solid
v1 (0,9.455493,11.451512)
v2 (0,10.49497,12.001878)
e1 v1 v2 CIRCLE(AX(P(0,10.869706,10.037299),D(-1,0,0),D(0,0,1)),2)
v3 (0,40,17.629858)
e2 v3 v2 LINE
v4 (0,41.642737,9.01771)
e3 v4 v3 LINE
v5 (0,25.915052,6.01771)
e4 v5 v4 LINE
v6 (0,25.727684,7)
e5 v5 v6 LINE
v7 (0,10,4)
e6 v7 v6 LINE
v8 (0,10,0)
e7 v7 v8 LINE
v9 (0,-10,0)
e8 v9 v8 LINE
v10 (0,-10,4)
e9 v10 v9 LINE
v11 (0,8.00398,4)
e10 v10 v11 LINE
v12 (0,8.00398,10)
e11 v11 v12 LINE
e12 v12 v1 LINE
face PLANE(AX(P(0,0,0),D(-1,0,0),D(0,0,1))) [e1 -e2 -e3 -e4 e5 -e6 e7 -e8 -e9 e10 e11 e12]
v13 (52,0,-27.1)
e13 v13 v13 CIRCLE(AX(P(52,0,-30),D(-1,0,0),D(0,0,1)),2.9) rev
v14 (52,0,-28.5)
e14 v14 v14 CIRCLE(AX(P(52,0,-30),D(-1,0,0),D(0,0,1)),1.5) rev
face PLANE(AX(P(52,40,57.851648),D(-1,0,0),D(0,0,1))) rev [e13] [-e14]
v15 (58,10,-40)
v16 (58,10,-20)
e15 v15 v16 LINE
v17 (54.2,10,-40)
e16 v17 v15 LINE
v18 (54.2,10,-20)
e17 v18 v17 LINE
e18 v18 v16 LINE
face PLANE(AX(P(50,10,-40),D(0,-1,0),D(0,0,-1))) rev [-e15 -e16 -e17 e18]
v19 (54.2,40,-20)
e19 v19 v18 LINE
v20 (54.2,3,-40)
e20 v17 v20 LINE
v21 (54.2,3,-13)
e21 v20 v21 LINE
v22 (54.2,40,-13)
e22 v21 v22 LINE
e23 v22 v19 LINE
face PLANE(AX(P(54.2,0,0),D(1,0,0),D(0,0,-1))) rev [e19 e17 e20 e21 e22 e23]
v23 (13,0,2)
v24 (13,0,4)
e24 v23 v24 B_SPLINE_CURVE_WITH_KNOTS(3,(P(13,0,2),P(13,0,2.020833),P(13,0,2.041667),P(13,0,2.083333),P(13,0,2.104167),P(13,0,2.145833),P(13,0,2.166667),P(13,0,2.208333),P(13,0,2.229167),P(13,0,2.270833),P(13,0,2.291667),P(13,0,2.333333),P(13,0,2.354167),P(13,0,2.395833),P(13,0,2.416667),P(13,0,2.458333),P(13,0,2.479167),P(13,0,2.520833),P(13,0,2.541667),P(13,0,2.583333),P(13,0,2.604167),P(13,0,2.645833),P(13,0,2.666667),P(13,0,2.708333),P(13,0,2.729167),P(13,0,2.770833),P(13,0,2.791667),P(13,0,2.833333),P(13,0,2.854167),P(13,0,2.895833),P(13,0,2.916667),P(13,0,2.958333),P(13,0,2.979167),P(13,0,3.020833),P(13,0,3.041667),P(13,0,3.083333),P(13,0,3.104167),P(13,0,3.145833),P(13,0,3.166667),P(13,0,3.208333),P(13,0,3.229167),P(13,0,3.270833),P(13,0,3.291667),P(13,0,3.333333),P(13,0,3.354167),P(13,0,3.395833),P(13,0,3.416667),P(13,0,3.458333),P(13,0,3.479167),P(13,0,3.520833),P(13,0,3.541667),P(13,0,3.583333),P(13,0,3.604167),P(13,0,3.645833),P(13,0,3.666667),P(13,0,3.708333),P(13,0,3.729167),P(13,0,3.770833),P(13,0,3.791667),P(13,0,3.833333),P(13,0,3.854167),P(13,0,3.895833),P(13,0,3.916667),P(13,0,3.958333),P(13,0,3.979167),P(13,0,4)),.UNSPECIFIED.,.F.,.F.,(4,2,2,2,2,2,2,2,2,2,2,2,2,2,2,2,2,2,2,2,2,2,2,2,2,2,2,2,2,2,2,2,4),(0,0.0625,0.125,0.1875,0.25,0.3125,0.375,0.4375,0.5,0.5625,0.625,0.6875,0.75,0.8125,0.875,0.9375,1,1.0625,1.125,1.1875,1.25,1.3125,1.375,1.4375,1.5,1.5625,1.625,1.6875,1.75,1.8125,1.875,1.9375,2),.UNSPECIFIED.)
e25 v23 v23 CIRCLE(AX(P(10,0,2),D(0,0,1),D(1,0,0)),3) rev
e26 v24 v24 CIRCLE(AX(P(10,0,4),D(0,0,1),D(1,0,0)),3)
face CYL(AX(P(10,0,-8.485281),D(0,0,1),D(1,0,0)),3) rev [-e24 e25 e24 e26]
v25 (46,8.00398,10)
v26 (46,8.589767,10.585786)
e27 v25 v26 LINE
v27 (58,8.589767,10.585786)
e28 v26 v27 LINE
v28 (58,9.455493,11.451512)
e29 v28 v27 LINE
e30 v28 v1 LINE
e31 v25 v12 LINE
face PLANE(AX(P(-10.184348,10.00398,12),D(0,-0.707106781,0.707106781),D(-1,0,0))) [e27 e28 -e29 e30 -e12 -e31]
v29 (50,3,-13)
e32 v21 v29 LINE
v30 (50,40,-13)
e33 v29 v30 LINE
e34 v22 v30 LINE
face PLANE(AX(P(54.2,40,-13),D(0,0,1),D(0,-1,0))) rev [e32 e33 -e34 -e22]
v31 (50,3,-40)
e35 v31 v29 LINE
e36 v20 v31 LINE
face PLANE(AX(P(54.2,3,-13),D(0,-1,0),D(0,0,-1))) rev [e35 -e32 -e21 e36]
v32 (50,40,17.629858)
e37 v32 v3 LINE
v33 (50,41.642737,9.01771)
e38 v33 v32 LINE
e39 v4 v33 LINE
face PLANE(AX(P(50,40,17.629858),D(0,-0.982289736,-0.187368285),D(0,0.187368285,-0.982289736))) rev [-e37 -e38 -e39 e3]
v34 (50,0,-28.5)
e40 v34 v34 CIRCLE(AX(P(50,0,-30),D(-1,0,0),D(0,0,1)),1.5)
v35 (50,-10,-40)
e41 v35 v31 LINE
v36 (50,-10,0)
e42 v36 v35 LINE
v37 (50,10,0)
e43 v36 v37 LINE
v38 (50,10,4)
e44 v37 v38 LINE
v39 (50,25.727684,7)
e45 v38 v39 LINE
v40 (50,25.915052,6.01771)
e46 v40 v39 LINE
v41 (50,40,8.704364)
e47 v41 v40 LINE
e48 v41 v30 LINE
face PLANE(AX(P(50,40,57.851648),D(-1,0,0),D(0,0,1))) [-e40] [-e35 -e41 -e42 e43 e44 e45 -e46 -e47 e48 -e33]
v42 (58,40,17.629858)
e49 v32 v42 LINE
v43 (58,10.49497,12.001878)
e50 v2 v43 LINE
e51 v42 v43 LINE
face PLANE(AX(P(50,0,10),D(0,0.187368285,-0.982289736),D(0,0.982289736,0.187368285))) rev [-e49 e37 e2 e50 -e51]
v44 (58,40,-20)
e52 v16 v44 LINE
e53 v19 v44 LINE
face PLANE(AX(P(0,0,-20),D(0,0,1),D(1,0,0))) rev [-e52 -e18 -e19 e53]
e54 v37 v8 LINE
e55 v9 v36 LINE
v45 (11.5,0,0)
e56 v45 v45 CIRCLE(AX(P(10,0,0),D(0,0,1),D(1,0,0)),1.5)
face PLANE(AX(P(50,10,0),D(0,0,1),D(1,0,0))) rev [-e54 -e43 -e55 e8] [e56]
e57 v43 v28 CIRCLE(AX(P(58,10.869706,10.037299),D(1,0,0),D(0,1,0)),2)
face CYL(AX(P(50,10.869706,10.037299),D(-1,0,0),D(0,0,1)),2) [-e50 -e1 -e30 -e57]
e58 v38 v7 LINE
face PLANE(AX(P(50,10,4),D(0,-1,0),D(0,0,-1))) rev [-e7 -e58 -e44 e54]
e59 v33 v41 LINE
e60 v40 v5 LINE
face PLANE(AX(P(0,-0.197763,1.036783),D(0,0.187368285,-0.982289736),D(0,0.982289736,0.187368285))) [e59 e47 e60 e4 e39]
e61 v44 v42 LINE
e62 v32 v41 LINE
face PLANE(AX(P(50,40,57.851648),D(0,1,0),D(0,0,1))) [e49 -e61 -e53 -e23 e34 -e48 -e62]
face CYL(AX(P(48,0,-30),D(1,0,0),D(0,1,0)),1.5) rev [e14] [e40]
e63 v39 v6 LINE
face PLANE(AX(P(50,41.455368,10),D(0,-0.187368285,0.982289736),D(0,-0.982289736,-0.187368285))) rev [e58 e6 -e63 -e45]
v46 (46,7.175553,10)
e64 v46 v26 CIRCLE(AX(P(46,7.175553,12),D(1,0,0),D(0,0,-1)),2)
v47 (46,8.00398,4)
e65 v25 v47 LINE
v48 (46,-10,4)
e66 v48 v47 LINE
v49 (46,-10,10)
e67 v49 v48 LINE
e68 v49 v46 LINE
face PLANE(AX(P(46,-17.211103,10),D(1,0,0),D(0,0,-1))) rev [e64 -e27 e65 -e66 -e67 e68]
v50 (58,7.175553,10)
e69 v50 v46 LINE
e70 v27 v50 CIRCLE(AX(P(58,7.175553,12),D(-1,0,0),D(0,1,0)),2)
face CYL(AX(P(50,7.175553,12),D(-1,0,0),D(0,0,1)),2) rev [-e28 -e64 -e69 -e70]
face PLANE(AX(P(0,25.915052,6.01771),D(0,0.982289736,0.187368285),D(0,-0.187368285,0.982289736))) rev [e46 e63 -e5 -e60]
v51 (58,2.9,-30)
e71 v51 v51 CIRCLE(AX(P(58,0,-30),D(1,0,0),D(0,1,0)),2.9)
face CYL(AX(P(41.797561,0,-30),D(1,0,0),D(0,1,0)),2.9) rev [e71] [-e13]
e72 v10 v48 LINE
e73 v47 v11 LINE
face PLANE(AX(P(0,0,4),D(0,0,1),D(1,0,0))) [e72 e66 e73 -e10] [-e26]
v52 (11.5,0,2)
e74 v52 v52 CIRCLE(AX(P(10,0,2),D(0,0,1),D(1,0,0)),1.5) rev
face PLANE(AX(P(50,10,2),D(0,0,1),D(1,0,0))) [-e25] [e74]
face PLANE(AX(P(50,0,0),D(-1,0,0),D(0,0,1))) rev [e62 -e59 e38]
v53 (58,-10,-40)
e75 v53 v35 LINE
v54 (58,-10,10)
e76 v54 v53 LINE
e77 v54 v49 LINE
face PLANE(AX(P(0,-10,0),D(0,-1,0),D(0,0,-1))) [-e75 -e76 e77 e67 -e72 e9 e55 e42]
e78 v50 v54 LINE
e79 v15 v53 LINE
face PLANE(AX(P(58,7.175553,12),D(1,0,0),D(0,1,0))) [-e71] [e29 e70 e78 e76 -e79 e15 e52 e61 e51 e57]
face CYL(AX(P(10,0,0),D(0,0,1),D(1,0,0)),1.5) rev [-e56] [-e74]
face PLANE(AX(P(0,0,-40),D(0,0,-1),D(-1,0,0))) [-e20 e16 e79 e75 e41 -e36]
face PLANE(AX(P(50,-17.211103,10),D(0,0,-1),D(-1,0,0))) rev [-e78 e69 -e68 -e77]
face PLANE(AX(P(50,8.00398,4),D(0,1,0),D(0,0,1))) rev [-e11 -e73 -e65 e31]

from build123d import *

# Parameters (mm, degrees)
EXTRUDE_1_DEPTH      = 50
SKETCH_2_W           = 50
SKETCH_2_H           = 10
EXTRUDE_2_DEPTH      = 10
SKETCH_3_W           = 10
SKETCH_3_H           = 20
EXTRUDE_3_DEPTH      = 20
SKETCH_4_W           = 20
SKETCH_4_H           = 10
EXTRUDE_4_DEPTH      = 30
CUT_EXTRUDE_1_DEPTH  = 50
CHAMFER_1_SIZE       = 2
SKETCH_9_R           = 1.5
CUT_EXTRUDE_2_DEPTH  = 66.715656955
CUT_EXTRUDE_4_DEPTH  = 6
SKETCH_13_W          = 4
SKETCH_13_H          = 6
EXTRUDE_12_DEPTH     = 18.003980276
FILLET_2_R           = 2
SKETCH_15_W          = 20
SKETCH_15_H          = 50
SKETCH_15_R          = 1.5
EXTRUDE_14_DEPTH     = 4
CUT_EXTRUDE_5_DEPTH  = 4
SKETCH_17_W          = 16
SKETCH_17_H          = 50
CUT_EXTRUDE_6_DEPTH  = 4
EXTRUDE_15_DEPTH     = 10
SKETCH_20_W          = 4
SKETCH_20_H          = 50
EXTRUDE_16_DEPTH     = 20
SKETCH_23_W          = 24
SKETCH_23_H          = 22
CUT_EXTRUDE_9_DEPTH  = 4
EXTRUDE_17_REACH     = 74.184
SKETCH_25_W          = 4
SKETCH_25_H          = 12.288957455
EXTRUDE_18_DEPTH     = 22
CUT_EXTRUDE_10_DEPTH = 4
CUT_EXTRUDE_START    = -4
CUT_EXTRUDE_11_DEPTH = 4
CUT_EXTRUDE_14_DEPTH = 10
EXTRUDE_19_DEPTH     = 4
SKETCH_35_W          = 8
SKETCH_35_H          = 20
EXTRUDE_20_DEPTH     = 22
SKETCH_36_W          = 8
SKETCH_36_H          = 20
EXTRUDE_21_DEPTH     = 20
CUT_EXTRUDE_17_DEPTH = 4.2
SKETCH_38_R          = 1.5
CUT_EXTRUDE_18_DEPTH = 10
SKETCH_39_R          = 2.9
CUT_EXTRUDE_19_DEPTH = 6
SKETCH_40_R          = 3
CUT_EXTRUDE_20_DEPTH = 2
SKETCH_41_W          = 50
SKETCH_41_H          = 16.011247617
EXTRUDE_22_DEPTH     = 1


with BuildPart() as part:
    # 草图1 → 凸台-拉伸1 (new body)
    with BuildSketch(Plane(origin=(0, 0, 0), x_dir=(0, 0, -1), z_dir=(1, 0, 0))):
        Polygon((0, 0), (-10, 0), (-17.629858184, 40), (-10, 41.455368398), (-4, 10), (0, 10), align=None)
    extrude(amount=EXTRUDE_1_DEPTH)

    # 草图2 → 凸台-拉伸2 (add)
    with BuildSketch(Plane.XZ):
        with Locations((25, 5)):
            Rectangle(SKETCH_2_W, SKETCH_2_H)
    extrude(amount=EXTRUDE_2_DEPTH)

    # 草图3 → 凸台-拉伸3 (add)
    with BuildSketch(Plane.ZY):
        with Locations((5, 0)):
            Rectangle(SKETCH_3_W, SKETCH_3_H)
    extrude(amount=EXTRUDE_3_DEPTH)

    # 草图4 → 凸台-拉伸4 (add)
    with BuildSketch(Plane(origin=(0, 10, 0), x_dir=(1, 0, 0), z_dir=(0, 1, 0))):
        with Locations((-10, -5)):
            Rectangle(SKETCH_4_W, SKETCH_4_H)
    extrude(amount=EXTRUDE_4_DEPTH)

    # 草图5 → 切除-拉伸1 (cut)
    with BuildSketch(Plane(origin=(50, 0, 0), x_dir=(0, 0, -1), z_dir=(1, 0, 0))):
        Polygon((-10, 10.003980276), (-11.908223769, 10.003980276), (-10, 0), align=None)
    extrude(amount=-CUT_EXTRUDE_1_DEPTH, mode=Mode.SUBTRACT)

    # 倒角1
    # the kernel refuses this chamfer: 2 mm, written as the material it adds along each edge
    with BuildSketch(Plane(origin=(50, 10.003980276, 10), x_dir=(0, 0.027495876610586487, 0.9996219169112968), z_dir=(-1, 0, 0))) as chamfer_1_piece_1_section:
        Polygon((CHAMFER_1_SIZE * 0.999621916911, -CHAMFER_1_SIZE * 0.0274958766106), (-CHAMFER_1_SIZE * 0.0274958766106, -CHAMFER_1_SIZE * 0.999621916911), (0, 0), align=None)
    chamfer_1_piece_1 = extrude(amount=50, mode=Mode.PRIVATE)
    chamfer_1_piece_1 = split(chamfer_1_piece_1, bisect_by=Plane(origin=(25, 9.131023425, 11.741710345), z_dir=(0, 0.18736828457892524, -0.9822897362458548)), keep=Keep.TOP, mode=Mode.PRIVATE)
    add(chamfer_1_piece_1)

    # 草图9 → 切除-拉伸2 (cut, through all)
    with BuildSketch(Plane.XY.offset(10)):
        with Locations((-10, 20)):
            Circle(SKETCH_9_R)
        with Locations((10, 0)):
            Circle(SKETCH_9_R)
    extrude(amount=-CUT_EXTRUDE_2_DEPTH, mode=Mode.SUBTRACT)

    # 草图12 → 切除-拉伸4 (cut)
    with BuildSketch(Plane.XY.offset(10)):
        Polygon((50, -10), (50, 8.003980276), (0, 8.003980276), (0, 40), (-20, 40), (-20, -10), align=None)
    extrude(amount=-CUT_EXTRUDE_4_DEPTH, mode=Mode.SUBTRACT)

    # 草图13 → 凸台-拉伸12 (add)
    with BuildSketch(Plane.XZ.offset(-8.003980276)):
        with Locations((2, 7)):
            Rectangle(SKETCH_13_W, SKETCH_13_H)
        with Locations((48, 7)):
            Rectangle(SKETCH_13_W, SKETCH_13_H)
    extrude(amount=EXTRUDE_12_DEPTH)

    # 圆角2
    fillet_2_edges = [part.edges().sort_by_distance(p)[0] for p in [
        (2, 8.003980276, 10),
        (48, 8.003980276, 10),
        (25, 9.890571776, 11.8865915),
    ]]
    fillet(fillet_2_edges, radius=FILLET_2_R)

    # 草图15 → 凸台-拉伸14 (add)
    with BuildSketch(Plane(origin=(0, 0, 0), x_dir=(-1, 0, 0), z_dir=(0, 0, -1))):
        with Locations((-60, 15)):
            Rectangle(SKETCH_15_W, SKETCH_15_H)
        with Locations(Location((-60, 20, 0), (0, 0, 180))):
            Circle(SKETCH_15_R, mode=Mode.SUBTRACT)
    extrude(amount=-EXTRUDE_14_DEPTH)

    # 草图16 → 切除-拉伸5 (cut)
    with BuildSketch(Plane.XY.offset(4)):
        Polygon((-20, -10), (0, -10), (0, 10), (0, 40), (-20, 40), align=None)
    extrude(amount=-CUT_EXTRUDE_5_DEPTH, mode=Mode.SUBTRACT)

    # 草图17 → 切除-拉伸6 (cut)
    with BuildSketch(Plane.XY.offset(4)):
        with Locations((62, 15)):
            Rectangle(SKETCH_17_W, SKETCH_17_H)
    extrude(amount=-CUT_EXTRUDE_6_DEPTH, mode=Mode.SUBTRACT)

    # 草图18 → 凸台-拉伸15 (add)
    with BuildSketch(Plane.ZY.offset(-50)):
        Polygon((0, 10), (4, 10), (5.907464546, 20), (0, 20), align=None)
    extrude(amount=EXTRUDE_15_DEPTH)

    # 草图20 → 凸台-拉伸16 (add)
    with BuildSketch(Plane(origin=(0, 0, 0), x_dir=(-1, 0, 0), z_dir=(0, 0, -1))):
        with Locations((-52, 15)):
            Rectangle(SKETCH_20_W, SKETCH_20_H)
    extrude(amount=EXTRUDE_16_DEPTH)

    # 草图23 → 切除-拉伸9 (cut)
    with BuildSketch(Plane(origin=(54, 0, 0), x_dir=(0, 0, -1), z_dir=(1, 0, 0))):
        with Locations((8, 1)):
            Rectangle(SKETCH_23_W, SKETCH_23_H)
    extrude(amount=-CUT_EXTRUDE_9_DEPTH, mode=Mode.SUBTRACT)

    # 凸台-拉伸17: up to this plane
    extrude_17_end = Plane(origin=(50, 0, 10), z_dir=(0, 0.18736828457892524, -0.9822897362458548))
    # 草图24 → 凸台-拉伸17 (add, up to the surface)
    with BuildSketch(Plane.XY.offset(4), mode=Mode.PRIVATE) as extrude_17_sk1:
        Polygon((50, 12), (54, 12), (54, 40), (50, 40), (50, 20), align=None)
    extrude_17_tool1 = split(extrude(extrude_17_sk1.sketch, amount=EXTRUDE_17_REACH, mode=Mode.PRIVATE), bisect_by=extrude_17_end, keep=Keep.BOTH, mode=Mode.PRIVATE)
    add(extrude_17_tool1.solids().sort_by_distance((52, 26, 4))[0])

    # 草图25 → 凸台-拉伸18 (add)
    with BuildSketch(Plane.XZ.offset(-12)):
        with Locations((52, 6.144478728)):
            Rectangle(SKETCH_25_W, SKETCH_25_H)
    extrude(amount=EXTRUDE_18_DEPTH)

    # 草图26 → 切除-拉伸10 (cut)
    with BuildSketch(Plane.ZY.offset(-50)):
        with BuildLine():
            Line((12.288957455, -10), (12.288957455, 12))
            Line((12.288957455, 12), (12.001878243, 10.494969601))
            ThreePointArc((12.001878243, 10.494969601), (11.804836237, 9.933858265), (11.451512332, 9.455492608))
            Line((11.451512332, 9.455492608), (10.585786438, 8.589766713))
            ThreePointArc((10.585786438, 8.589766713), (10.152240935, 7.940920016), (10, 7.175553151))
            Line((10, 7.175553151), (10, -10))
            Line((10, -10), (12.288957455, -10))
        make_face()
    extrude(amount=-CUT_EXTRUDE_10_DEPTH, mode=Mode.SUBTRACT)

    # 草图27 → 切除-拉伸11 (cut)
    with BuildSketch(Plane(origin=(4, 0, 0), x_dir=(0, 0, -1), z_dir=(1, 0, 0)).offset(CUT_EXTRUDE_START)):
        with BuildLine():
            Line((-10, -10), (-4, -10))
            Line((-4, -10), (-4, 8.003980276))
            Line((-4, 8.003980276), (-10, 8.003980276))
            Line((-10, 8.003980276), (-10.585786438, 8.589766713))
            ThreePointArc((-10.585786438, 8.589766713), (-10.152240935, 7.940920016), (-10, 7.175553151))
            Line((-10, 7.175553151), (-10, -10))
        make_face()
    extrude(amount=CUT_EXTRUDE_11_DEPTH, mode=Mode.SUBTRACT)

    # 草图31 → 切除-拉伸14 (cut)
    with BuildSketch(Plane.ZY.offset(-40)):
        Polygon((0, 20), (0, 10), (4, 10), (5.907464546, 20), align=None)
    extrude(amount=-CUT_EXTRUDE_14_DEPTH, mode=Mode.SUBTRACT)

    # 草图32 → 凸台-拉伸19 (add)
    with BuildSketch(Plane(origin=(54, 0, 0), x_dir=(0, 0, -1), z_dir=(1, 0, 0))):
        with BuildLine():
            Line((-10, 7.175553151), (-10, -10))
            Line((-10, -10), (0, -10))
            Line((0, -10), (0, 12))
            Line((0, 12), (20, 12))
            Line((20, 12), (20, 40))
            Line((20, 40), (-17.629858184, 40))
            Line((-17.629858184, 40), (-12.001878243, 10.494969601))
            ThreePointArc((-12.001878243, 10.494969601), (-11.804836237, 9.933858265), (-11.451512332, 9.455492608))
            Line((-11.451512332, 9.455492608), (-10.585786438, 8.589766713))
            ThreePointArc((-10.585786438, 8.589766713), (-10.152240935, 7.940920016), (-10, 7.175553151))
        make_face()
    extrude(amount=EXTRUDE_19_DEPTH)

    # 草图35 → 凸台-拉伸20 (add)
    with BuildSketch(Plane.XZ.offset(-12)):
        with Locations((54, -10)):
            Rectangle(SKETCH_35_W, SKETCH_35_H)
    extrude(amount=EXTRUDE_20_DEPTH)

    # 草图36 → 凸台-拉伸21 (add)
    with BuildSketch(Plane(origin=(0, 0, -20), x_dir=(-1, 0, 0), z_dir=(0, 0, -1))):
        with Locations((-54, 0)):
            Rectangle(SKETCH_36_W, SKETCH_36_H)
    extrude(amount=EXTRUDE_21_DEPTH)

    # 草图37 → 切除-拉伸17 (cut)
    with BuildSketch(Plane.ZY.offset(-50)):
        Polygon((-20, 40), (-13, 40), (-13, 3), (-40, 3), (-40, 10), (-20, 10), align=None)
    extrude(amount=-CUT_EXTRUDE_17_DEPTH, mode=Mode.SUBTRACT)

    # 草图38 → 切除-拉伸18 (cut)
    with BuildSketch(Plane(origin=(58, 0, 0), x_dir=(0, 0, -1), z_dir=(1, 0, 0))):
        with Locations(Location((30, 0, 0), (0, 0, 90))):
            Circle(SKETCH_38_R)
    extrude(amount=-CUT_EXTRUDE_18_DEPTH, mode=Mode.SUBTRACT)

    # 草图39 → 切除-拉伸19 (cut)
    with BuildSketch(Plane(origin=(58, 0, 0), x_dir=(0, 0, -1), z_dir=(1, 0, 0))):
        with Locations(Location((30, 0, 0), (0, 0, 90))):
            Circle(SKETCH_39_R)
    extrude(amount=-CUT_EXTRUDE_19_DEPTH, mode=Mode.SUBTRACT)

    # 草图40 → 切除-拉伸20 (cut)
    with BuildSketch(Plane.XY.offset(4)):
        with Locations((10, 0)):
            Circle(SKETCH_40_R)
    extrude(amount=-CUT_EXTRUDE_20_DEPTH, mode=Mode.SUBTRACT)

    # 草图41 → 凸台-拉伸22 (add)
    with BuildSketch(Plane(origin=(0, -0.385131031, 2.019073075), x_dir=(-1, 0, 0), z_dir=(0, 0.18736828457892515, -0.9822897362458548))):
        with Locations((-25, 34.589241927)):
            Rectangle(SKETCH_41_W, SKETCH_41_H)
    extrude(amount=EXTRUDE_22_DEPTH)


solid = part.part
